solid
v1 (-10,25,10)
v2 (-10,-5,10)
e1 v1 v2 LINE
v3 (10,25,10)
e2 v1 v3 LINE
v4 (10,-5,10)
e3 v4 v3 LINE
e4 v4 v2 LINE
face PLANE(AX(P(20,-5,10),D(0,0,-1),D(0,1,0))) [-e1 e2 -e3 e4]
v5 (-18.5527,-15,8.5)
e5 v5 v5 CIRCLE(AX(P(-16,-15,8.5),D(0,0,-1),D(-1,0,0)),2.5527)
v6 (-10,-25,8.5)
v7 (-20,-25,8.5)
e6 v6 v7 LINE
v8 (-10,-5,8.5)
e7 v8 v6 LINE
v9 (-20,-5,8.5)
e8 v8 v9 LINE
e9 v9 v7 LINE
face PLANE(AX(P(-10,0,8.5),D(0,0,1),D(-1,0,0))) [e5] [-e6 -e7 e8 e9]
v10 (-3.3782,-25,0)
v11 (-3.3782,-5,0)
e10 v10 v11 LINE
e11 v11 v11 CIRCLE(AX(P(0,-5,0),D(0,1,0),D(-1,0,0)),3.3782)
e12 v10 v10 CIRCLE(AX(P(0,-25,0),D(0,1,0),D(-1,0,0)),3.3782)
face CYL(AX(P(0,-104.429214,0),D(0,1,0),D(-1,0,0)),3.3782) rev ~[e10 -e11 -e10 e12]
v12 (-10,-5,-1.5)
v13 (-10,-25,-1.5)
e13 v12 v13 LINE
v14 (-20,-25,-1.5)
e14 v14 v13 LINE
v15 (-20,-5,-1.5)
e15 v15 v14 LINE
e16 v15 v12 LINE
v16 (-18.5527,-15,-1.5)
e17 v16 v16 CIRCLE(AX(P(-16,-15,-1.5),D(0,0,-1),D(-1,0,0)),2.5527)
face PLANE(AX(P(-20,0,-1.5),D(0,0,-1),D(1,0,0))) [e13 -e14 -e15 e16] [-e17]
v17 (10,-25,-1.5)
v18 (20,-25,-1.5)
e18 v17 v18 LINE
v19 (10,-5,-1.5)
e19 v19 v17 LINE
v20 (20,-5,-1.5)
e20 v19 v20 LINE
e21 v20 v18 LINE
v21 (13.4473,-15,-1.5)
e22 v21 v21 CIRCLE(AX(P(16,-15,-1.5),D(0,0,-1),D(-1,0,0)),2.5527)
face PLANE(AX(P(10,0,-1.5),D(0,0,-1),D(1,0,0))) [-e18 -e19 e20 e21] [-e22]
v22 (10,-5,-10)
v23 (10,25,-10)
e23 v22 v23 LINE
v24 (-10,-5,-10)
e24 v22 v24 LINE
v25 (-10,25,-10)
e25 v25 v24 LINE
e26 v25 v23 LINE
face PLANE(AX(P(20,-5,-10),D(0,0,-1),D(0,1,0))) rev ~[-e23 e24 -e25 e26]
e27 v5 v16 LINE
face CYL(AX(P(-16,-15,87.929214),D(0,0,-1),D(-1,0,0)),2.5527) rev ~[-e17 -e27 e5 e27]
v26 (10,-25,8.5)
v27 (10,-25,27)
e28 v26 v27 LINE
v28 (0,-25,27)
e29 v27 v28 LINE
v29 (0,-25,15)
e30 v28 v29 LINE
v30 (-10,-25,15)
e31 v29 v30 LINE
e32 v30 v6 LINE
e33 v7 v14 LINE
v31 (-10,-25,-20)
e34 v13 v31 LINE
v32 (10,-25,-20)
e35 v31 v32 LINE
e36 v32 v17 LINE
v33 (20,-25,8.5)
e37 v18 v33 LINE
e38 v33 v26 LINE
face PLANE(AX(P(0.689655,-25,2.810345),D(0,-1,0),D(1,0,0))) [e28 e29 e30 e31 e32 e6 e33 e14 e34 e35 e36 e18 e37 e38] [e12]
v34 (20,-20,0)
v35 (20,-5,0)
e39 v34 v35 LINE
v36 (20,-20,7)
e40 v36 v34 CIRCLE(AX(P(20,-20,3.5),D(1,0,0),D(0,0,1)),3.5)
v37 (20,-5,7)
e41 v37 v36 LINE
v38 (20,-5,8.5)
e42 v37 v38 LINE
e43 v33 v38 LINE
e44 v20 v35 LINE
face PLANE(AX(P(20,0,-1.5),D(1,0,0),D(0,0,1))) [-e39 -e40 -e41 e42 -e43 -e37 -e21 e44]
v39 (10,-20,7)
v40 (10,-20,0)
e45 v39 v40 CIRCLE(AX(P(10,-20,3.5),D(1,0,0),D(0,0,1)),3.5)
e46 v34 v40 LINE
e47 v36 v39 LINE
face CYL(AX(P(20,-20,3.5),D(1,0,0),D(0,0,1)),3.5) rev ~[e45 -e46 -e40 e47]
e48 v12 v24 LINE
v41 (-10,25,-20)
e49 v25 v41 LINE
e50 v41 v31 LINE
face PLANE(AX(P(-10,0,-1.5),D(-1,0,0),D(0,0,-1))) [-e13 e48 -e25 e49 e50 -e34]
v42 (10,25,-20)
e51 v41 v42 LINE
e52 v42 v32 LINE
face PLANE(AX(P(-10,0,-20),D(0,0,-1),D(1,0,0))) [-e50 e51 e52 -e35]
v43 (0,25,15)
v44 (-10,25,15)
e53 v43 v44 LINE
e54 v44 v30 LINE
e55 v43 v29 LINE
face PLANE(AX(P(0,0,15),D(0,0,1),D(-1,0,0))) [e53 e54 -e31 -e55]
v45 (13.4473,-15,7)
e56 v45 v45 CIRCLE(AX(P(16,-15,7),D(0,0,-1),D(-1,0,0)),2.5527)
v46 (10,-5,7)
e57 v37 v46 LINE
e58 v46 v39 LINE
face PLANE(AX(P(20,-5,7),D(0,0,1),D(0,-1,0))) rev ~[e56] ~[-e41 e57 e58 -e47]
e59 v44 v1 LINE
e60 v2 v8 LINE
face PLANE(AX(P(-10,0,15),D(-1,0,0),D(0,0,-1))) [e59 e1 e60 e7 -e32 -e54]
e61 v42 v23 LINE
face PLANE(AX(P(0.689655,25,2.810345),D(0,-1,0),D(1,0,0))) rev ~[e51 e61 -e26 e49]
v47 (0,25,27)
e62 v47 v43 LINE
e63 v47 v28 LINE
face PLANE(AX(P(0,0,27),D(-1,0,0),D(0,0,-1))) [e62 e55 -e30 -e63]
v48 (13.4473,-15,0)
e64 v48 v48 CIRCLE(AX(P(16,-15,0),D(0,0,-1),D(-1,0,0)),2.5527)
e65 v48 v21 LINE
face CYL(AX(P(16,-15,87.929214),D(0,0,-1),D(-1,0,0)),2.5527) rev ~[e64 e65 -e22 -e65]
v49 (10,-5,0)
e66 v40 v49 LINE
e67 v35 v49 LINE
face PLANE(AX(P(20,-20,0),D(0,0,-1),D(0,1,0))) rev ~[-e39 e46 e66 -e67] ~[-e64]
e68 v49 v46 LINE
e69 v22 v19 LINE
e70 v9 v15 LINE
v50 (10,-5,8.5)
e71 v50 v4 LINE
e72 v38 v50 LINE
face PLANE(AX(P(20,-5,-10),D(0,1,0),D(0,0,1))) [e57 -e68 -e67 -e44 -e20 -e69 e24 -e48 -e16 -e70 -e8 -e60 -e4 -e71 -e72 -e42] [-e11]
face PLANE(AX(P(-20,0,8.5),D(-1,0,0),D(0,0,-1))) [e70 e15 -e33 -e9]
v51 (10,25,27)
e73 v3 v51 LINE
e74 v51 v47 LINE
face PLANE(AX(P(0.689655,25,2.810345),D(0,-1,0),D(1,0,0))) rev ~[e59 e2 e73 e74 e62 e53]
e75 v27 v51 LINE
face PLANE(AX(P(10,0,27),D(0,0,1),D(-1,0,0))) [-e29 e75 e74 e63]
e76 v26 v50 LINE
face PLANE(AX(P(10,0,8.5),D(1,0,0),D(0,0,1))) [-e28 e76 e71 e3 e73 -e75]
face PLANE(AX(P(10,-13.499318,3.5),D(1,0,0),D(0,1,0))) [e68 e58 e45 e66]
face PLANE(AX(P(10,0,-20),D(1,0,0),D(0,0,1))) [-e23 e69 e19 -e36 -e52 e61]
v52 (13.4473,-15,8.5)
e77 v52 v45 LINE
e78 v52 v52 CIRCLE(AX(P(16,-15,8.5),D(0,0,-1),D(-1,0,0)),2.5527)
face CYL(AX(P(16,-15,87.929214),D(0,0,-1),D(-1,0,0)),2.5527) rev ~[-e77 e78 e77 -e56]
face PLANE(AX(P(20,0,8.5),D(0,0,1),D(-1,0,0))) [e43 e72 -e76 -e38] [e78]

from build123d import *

# Parameters (mm, degrees)
F1_DEPTH = 25
F3_D     = 6.7564
F4_W     = 69.7505115181
F4_H     = 20
F5_DEPTH = 40.001
F7_DEPTH = 10
F9_D     = 5.1054


# Not quite as in the source:
# - a feature names something its author has since deleted; it is built from what else it names


with BuildPart() as f1:
    # F0 (on Front) → F1 (new body, symmetric)
    with BuildSketch(Plane.XZ):
        Polygon((10, 27), (0, 27), (0, 15), (-10, 15), (-10, 8.5), (-20, 8.5), (-20, -1.5), (-10, -1.5), (-10, -20), (10, -20), (10, -1.5), (20, -1.5), (20, 8.5), (10, 8.5), align=None)
    extrude(amount=F1_DEPTH, both=True)

    # F3 (through all)
    with Locations(Plane.XZ.offset(25)):
        with Locations((0, 0)):
            Hole(F3_D / 2)

    # F4 (on face) → F5 (cut, through all)
    with BuildSketch(Plane.YZ.offset(20)):
        with Locations((29.875255759, 0)):
            Rectangle(F4_W, F4_H)
    extrude(amount=-F5_DEPTH, mode=Mode.SUBTRACT)

    # F6 (on face) → F7 (cut)
    with BuildSketch(Plane.YZ.offset(20)):
        with BuildLine():
            ThreePointArc((-20, 7), (-23.5, 3.5), (-20, 0))
            Line((-20, 0), (-5, 0))
            Line((-5, 0), (-5, 7))
            Line((-5, 7), (-20, 7))
        make_face()
    extrude(amount=-F7_DEPTH, mode=Mode.SUBTRACT)

    # F9 (through all)
    with Locations(Plane.XY.offset(8.5)):
        with Locations((16, -15), (-16, -15)):
            Hole(F9_D / 2)


solid = f1.part
